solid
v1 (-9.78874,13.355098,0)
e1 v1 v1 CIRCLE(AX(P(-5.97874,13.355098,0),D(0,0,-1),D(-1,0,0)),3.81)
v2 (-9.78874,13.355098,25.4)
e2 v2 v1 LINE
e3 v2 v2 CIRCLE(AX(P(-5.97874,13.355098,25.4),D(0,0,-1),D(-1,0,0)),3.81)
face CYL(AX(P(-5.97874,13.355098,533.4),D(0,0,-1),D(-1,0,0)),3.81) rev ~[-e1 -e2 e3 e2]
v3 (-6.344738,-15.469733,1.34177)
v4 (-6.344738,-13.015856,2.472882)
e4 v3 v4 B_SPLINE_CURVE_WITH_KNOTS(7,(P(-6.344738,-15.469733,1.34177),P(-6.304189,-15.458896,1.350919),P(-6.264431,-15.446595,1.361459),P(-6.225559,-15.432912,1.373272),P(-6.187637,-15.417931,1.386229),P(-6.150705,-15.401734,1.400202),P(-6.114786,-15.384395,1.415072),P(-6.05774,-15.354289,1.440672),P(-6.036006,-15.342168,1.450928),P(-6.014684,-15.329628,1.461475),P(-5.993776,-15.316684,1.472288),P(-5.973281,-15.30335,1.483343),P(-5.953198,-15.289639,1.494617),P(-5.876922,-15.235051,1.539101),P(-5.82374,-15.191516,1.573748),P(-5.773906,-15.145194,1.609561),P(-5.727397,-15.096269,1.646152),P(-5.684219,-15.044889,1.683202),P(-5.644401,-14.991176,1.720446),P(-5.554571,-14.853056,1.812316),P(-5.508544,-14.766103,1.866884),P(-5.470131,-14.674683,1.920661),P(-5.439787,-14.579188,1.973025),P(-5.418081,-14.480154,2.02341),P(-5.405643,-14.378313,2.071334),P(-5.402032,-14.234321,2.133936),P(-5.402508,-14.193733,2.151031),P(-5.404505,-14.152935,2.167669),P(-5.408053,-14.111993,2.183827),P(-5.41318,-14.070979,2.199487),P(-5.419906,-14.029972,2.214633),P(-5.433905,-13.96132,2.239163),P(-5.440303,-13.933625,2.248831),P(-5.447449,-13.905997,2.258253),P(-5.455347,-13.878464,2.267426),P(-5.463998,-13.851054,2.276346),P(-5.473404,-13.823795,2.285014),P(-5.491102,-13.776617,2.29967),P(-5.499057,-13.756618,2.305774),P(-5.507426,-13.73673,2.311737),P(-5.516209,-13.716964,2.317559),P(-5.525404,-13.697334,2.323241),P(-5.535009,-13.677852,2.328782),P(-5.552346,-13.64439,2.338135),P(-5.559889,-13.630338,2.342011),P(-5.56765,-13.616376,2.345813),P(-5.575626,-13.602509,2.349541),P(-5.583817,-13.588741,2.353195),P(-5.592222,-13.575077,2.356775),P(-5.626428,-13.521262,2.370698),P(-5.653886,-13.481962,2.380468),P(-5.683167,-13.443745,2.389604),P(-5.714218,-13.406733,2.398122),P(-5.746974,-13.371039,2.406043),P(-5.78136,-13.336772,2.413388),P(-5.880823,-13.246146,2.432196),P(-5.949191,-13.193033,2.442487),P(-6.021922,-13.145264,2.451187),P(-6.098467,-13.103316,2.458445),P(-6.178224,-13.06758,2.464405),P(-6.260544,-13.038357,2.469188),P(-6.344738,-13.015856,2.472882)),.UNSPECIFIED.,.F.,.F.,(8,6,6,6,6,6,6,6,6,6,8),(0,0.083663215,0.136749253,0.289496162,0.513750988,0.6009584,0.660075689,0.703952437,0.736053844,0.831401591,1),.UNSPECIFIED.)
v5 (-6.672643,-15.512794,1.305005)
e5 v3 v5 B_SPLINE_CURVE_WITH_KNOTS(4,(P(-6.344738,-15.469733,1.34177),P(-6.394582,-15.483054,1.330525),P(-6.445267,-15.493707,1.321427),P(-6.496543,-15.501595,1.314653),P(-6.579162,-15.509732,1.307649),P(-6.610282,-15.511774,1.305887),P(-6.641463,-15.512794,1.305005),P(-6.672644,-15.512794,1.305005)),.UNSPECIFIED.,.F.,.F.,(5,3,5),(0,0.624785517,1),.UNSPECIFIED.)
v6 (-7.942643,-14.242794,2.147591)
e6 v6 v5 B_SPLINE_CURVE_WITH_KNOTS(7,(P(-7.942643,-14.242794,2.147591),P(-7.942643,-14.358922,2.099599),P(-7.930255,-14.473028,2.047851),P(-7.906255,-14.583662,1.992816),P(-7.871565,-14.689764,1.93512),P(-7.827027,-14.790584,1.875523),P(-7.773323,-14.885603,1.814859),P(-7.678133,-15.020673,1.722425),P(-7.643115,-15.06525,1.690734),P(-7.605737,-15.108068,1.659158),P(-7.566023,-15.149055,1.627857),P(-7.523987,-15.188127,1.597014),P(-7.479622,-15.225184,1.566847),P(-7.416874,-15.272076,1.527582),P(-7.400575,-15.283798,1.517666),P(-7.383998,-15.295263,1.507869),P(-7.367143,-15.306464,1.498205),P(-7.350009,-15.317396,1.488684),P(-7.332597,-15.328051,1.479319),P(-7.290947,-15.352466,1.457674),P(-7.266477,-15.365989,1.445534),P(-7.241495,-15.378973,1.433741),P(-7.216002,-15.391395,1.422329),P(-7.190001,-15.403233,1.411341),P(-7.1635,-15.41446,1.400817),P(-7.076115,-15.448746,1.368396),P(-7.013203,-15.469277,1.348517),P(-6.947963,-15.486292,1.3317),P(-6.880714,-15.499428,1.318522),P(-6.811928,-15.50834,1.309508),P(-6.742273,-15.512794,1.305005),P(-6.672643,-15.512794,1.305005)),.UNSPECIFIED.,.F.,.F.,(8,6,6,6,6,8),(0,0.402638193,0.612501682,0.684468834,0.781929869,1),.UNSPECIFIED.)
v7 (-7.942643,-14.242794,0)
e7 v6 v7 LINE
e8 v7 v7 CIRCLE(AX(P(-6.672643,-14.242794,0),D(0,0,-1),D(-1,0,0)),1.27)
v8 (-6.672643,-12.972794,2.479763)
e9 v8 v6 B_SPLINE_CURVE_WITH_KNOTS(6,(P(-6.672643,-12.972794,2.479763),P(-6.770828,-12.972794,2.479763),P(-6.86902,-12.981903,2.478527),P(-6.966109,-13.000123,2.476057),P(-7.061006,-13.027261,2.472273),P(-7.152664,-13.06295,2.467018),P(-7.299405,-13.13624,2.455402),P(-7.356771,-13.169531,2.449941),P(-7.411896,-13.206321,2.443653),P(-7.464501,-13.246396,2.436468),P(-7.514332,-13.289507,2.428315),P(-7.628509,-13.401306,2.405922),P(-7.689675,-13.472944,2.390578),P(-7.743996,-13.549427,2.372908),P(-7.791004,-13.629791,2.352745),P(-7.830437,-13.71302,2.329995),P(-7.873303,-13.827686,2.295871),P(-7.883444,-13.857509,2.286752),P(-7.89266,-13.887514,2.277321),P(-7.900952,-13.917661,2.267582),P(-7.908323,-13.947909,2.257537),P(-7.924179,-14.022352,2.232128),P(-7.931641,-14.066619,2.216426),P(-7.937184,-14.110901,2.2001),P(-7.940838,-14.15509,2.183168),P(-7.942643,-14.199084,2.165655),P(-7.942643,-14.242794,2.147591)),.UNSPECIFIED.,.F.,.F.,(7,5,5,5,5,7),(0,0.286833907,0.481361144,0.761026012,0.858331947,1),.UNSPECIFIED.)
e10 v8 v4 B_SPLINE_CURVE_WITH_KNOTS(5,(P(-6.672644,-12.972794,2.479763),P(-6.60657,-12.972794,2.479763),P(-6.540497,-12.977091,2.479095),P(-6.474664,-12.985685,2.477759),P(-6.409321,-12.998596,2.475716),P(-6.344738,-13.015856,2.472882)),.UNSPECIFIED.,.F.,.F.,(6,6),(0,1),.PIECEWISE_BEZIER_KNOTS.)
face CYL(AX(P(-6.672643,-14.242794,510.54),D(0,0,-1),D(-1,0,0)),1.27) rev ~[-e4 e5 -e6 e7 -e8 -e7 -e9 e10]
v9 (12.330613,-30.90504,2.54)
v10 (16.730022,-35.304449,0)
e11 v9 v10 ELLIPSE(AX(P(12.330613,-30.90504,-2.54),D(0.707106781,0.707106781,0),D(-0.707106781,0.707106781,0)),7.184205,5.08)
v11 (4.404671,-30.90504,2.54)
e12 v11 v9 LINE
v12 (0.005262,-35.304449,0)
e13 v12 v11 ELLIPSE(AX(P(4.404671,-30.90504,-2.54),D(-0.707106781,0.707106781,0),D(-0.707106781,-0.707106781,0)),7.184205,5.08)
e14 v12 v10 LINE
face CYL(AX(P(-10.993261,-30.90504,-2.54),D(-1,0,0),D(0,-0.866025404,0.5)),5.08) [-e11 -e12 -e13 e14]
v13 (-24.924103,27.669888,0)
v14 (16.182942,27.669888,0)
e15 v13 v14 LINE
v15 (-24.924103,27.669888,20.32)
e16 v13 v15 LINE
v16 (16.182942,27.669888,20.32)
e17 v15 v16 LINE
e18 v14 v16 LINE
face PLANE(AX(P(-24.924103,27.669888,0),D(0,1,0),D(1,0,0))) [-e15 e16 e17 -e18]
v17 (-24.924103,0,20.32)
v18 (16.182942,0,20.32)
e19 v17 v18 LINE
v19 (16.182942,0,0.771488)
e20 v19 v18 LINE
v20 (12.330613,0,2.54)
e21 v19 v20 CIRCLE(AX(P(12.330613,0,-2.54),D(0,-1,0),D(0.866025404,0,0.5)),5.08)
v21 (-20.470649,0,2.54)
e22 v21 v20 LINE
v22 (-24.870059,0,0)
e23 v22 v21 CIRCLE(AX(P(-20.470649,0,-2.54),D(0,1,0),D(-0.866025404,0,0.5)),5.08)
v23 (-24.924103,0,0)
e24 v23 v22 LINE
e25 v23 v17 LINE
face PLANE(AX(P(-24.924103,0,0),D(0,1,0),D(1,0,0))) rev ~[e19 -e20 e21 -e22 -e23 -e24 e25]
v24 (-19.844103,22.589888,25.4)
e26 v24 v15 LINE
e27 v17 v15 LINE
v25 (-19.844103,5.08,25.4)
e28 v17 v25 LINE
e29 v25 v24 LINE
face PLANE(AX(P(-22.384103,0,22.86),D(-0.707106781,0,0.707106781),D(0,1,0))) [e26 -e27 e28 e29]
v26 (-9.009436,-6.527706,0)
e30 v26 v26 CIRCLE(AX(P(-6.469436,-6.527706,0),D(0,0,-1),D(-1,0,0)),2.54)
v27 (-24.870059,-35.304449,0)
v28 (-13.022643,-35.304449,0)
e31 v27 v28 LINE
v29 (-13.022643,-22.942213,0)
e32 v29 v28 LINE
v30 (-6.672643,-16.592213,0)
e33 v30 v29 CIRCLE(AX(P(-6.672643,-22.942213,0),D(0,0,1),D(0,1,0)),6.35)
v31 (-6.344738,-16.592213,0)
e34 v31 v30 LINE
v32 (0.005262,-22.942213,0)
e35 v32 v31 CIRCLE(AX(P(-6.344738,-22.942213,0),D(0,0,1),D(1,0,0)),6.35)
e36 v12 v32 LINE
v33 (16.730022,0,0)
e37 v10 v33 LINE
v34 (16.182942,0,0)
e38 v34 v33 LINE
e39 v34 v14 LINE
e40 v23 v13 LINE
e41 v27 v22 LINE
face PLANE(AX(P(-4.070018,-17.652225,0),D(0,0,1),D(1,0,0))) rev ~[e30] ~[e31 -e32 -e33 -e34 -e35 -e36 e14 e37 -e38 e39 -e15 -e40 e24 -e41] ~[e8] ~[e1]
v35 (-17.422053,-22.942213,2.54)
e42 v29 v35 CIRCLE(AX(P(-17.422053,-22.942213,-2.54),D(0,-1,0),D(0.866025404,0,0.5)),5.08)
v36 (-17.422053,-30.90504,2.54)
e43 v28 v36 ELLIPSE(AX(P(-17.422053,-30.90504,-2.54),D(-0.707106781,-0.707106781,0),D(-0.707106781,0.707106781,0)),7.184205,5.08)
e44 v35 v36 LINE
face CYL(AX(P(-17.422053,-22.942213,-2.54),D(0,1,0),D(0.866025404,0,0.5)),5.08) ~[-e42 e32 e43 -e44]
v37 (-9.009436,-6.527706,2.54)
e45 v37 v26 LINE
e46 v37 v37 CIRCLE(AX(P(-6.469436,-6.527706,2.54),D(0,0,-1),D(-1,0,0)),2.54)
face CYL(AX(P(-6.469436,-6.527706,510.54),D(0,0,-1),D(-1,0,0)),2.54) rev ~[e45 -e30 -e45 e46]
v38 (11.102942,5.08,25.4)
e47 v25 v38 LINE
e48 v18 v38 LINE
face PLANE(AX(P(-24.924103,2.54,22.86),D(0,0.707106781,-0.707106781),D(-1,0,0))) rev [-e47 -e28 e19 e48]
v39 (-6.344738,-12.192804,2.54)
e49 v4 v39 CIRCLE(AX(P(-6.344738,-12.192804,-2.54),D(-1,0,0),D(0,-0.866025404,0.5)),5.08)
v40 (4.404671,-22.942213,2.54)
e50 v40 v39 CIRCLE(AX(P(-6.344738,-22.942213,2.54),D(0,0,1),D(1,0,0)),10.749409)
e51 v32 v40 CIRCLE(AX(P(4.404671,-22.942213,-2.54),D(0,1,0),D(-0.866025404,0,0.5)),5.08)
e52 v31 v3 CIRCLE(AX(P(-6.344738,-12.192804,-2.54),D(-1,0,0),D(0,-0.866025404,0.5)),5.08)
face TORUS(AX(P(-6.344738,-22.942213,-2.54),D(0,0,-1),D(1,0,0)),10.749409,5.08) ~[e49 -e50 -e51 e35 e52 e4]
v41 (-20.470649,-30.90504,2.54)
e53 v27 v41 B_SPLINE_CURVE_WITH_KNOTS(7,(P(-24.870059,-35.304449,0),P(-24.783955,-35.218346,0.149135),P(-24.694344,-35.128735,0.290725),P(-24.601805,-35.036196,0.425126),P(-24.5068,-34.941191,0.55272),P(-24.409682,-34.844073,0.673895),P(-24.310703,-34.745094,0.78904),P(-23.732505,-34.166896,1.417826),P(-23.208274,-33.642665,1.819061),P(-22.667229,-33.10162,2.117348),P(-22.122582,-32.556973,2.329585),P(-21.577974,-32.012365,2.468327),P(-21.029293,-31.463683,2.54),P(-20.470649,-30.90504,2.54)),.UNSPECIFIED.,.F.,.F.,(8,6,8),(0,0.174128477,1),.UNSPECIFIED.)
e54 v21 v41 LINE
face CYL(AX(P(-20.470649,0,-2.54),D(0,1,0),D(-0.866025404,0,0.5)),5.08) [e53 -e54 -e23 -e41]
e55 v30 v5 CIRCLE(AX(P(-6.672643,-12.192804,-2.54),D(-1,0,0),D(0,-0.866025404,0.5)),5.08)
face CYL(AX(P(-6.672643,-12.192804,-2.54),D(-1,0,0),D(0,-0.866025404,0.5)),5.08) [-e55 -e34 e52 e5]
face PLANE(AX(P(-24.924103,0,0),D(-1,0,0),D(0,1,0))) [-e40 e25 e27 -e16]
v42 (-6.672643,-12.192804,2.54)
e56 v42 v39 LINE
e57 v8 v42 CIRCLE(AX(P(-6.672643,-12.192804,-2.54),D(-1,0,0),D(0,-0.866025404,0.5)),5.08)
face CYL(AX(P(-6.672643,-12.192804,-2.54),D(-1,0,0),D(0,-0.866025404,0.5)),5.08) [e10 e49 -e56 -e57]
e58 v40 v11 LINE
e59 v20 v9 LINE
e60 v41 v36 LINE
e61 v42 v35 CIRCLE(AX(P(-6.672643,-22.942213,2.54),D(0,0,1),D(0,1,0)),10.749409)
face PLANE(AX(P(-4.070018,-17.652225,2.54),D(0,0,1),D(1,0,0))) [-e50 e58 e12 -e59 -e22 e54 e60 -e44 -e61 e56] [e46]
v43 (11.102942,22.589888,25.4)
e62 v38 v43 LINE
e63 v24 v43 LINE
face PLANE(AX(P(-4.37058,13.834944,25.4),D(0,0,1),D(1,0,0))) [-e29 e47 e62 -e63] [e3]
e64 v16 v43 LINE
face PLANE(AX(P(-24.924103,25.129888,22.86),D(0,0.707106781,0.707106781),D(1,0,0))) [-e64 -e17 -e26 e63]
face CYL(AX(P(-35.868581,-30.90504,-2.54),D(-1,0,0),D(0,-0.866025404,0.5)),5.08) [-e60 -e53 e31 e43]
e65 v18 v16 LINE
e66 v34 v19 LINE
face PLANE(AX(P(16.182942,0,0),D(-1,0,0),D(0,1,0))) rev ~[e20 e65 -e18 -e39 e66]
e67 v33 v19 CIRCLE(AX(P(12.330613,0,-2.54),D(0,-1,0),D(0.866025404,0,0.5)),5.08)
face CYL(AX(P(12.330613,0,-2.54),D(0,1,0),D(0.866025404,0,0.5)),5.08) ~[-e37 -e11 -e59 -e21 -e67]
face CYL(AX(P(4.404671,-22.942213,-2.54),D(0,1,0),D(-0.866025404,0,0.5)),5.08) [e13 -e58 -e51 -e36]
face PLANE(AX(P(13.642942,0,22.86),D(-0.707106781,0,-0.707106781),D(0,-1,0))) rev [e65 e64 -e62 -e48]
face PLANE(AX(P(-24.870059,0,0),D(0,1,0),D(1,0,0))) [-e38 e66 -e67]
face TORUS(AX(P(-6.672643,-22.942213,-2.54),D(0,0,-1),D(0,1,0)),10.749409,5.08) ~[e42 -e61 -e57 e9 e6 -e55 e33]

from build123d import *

# Parameters (mm, degrees)
F0_W          = 41.1070454866
F0_H          = 27.6698879898
F1_DEPTH      = 25.4
F2_W          = 41.600080207
F2_H          = 35.3044494987
F3_DEPTH      = 2.54
F5_DEPTH      = 25.4
F7_D          = 7.62
F7_DEPTH      = 508
F7_TIP        = 2.2892789585
F9_D          = 2.54
F9_DEPTH      = 508
F9_TIP        = 0.7630929862
F11_D         = 5.08
F11_DEPTH     = 508
F11_TIP       = 1.5261859723
F12_SIZE      = 5.08
F13_T1_DEPTH  = 46.3029721267
F13_T3_DEPTH  = 38.7218051595
F13_T5_DEPTH  = 33.8444602975
F13_T7_DEPTH  = 23.3607587036
F13_T9_DEPTH  = 0.3279052623
F13_T12_ANGLE = 90
F13_T14_ANGLE = 90


# Not quite as in the source:
# - a fillet or chamfer that OpenCascade refuses, or shapes differently, is made with other operations: its cross-section is extruded or revolved along the edge and cut away or added


with BuildPart() as f1:
    # F0 (on Top) → F1 (new body)
    with BuildSketch(Plane.XY):
        with Locations((-4.3705804273, 13.8349439949)):
            Rectangle(F0_W, F0_H)
    extrude(amount=F1_DEPTH)

    # F2 (on Top) → F3 (join)
    with BuildSketch(Plane.XY):
        with Locations((-4.0700184181, -17.6522247493)):
            Rectangle(F2_W, F2_H)
    extrude(amount=F3_DEPTH)

    # F4 (on face) → F5 (cut)
    with BuildSketch(Plane.XY.offset(2.54)):
        with BuildLine():
            Line((-13.0226434802, -22.9422134231), (-13.0226434802, -45.534973538))
            Line((-13.0226434802, -45.534973538), (0.005261782, -45.534973538))
            Line((0.005261782, -45.534973538), (0.005261782, -22.9422134231))
            ThreePointArc((0.005261782, -22.9422134231), (-1.8546101574, -18.4520853626), (-6.344738218, -16.5922134231))
            Line((-6.344738218, -16.5922134231), (-6.6726434802, -16.5922134231))
            ThreePointArc((-6.6726434802, -16.5922134231), (-11.1627715408, -18.4520853626), (-13.0226434802, -22.9422134231))
        make_face()
    extrude(amount=-F5_DEPTH, mode=Mode.SUBTRACT)

    # F7
    with Locations(Plane.XY.offset(25.4)):
        with Locations((-5.9787402861, 13.3550977334)):
            Hole(F7_D / 2, depth=F7_DEPTH)
            with Locations((0, 0, -(F7_DEPTH + F7_TIP / 2))):  # 118° drill point
                Cone(0, F7_D / 2, F7_TIP, mode=Mode.SUBTRACT)

    # F9
    with Locations(Plane.XY.offset(2.54)):
        with Locations((-6.6726434802, -14.2427943647)):
            Hole(F9_D / 2, depth=F9_DEPTH)
            with Locations((0, 0, -(F9_DEPTH + F9_TIP / 2))):  # 118° drill point
                Cone(0, F9_D / 2, F9_TIP, mode=Mode.SUBTRACT)

    # F11
    with Locations(Plane.XY.offset(2.54)):
        with Locations((-6.4694355242, -6.5277060494)):
            Hole(F11_D / 2, depth=F11_DEPTH)
            with Locations((0, 0, -(F11_DEPTH + F11_TIP / 2))):  # 118° drill point
                Cone(0, F11_D / 2, F11_TIP, mode=Mode.SUBTRACT)

    # F12
    f12_edges = [f1.edges().sort_by_distance(p)[0] for p in [
        (-4.37058, 0, 25.4),
        (16.182942, 13.834944, 25.4),
        (-4.37058, 27.669888, 25.4),
        (-24.924103, 13.834944, 25.4),
    ]]
    chamfer(f12_edges, length=F12_SIZE)

    # F13: fillet of radius 5.08 on 5 edges, made by hand

    # F13_s2 → F13_t1 (cut)
    with BuildSketch(Plane.XZ):
        with BuildLine():
            ThreePointArc((16.7300216854, 0), (14.8706126341, 1.8594090512), (12.3306126341, 2.54))
            Line((12.3306126341, 2.54), (16.7300216854, 2.54))
            Line((16.7300216854, 2.54), (16.7300216854, 0))
        make_face()
        with BuildLine():
            ThreePointArc((-24.8700585216, 0), (-23.0106494704, 1.8594090512), (-20.4706494704, 2.54))
            Line((-20.4706494704, 2.54), (-24.8700585216, 2.54))
            Line((-24.8700585216, 2.54), (-24.8700585216, 0))
        make_face()
    extrude(amount=F13_T1_DEPTH, mode=Mode.SUBTRACT)

    # F13_s4 → F13_t3 (cut)
    with BuildSketch(Plane.YZ.offset(-10.993260846)):
        with BuildLine():
            ThreePointArc((-35.3044494987, 0), (-33.4450404474, 1.8594090512), (-30.9050404474, 2.54))
            Line((-30.9050404474, 2.54), (-35.3044494987, 2.54))
            Line((-35.3044494987, 2.54), (-35.3044494987, 0))
        make_face()
    extrude(amount=F13_T3_DEPTH, mode=Mode.SUBTRACT)

    # F13_s6 → F13_t5 (cut)
    with BuildSketch(Plane.YZ.offset(-35.8685811497)):
        with BuildLine():
            ThreePointArc((-35.3044494987, 0), (-33.4450404474, 1.8594090512), (-30.9050404474, 2.54))
            Line((-30.9050404474, 2.54), (-35.3044494987, 2.54))
            Line((-35.3044494987, 2.54), (-35.3044494987, 0))
        make_face()
    extrude(amount=F13_T5_DEPTH, mode=Mode.SUBTRACT)

    # F13_s8 → F13_t7 (cut)
    with BuildSketch(Plane.XZ.offset(22.9422134231)):
        with BuildLine():
            ThreePointArc((0.005261782, 0), (1.8646708333, 1.8594090512), (4.4046708333, 2.54))
            Line((4.4046708333, 2.54), (0.005261782, 2.54))
            Line((0.005261782, 2.54), (0.005261782, 0))
        make_face()
        with BuildLine():
            ThreePointArc((-13.0226434802, 0), (-14.8820525315, 1.8594090512), (-17.4220525315, 2.54))
            Line((-17.4220525315, 2.54), (-13.0226434802, 2.54))
            Line((-13.0226434802, 2.54), (-13.0226434802, 0))
        make_face()
    extrude(amount=F13_T7_DEPTH, mode=Mode.SUBTRACT)

    # F13_s10 → F13_t9 (cut)
    with BuildSketch(Plane.YZ.offset(-6.6726434802)):
        with BuildLine():
            ThreePointArc((-16.5922134231, 0), (-14.7328043719, 1.8594090512), (-12.1928043719, 2.54))
            Line((-12.1928043719, 2.54), (-16.5922134231, 2.54))
            Line((-16.5922134231, 2.54), (-16.5922134231, 0))
        make_face()
    extrude(amount=F13_T9_DEPTH, mode=Mode.SUBTRACT)

    # F13_s11 → F13_t12 (revolve, cut)
    with BuildSketch(Plane.XZ.offset(22.9422134231)):
        with BuildLine():
            ThreePointArc((0.005261782, 0), (1.8646708333, 1.8594090512), (4.4046708333, 2.54))
            Line((4.4046708333, 2.54), (0.005261782, 2.54))
            Line((0.005261782, 2.54), (0.005261782, 0))
        make_face()
    revolve(axis=Axis((-6.344738218, -22.9422134231, 2.54), (0, 0, 1)), revolution_arc=F13_T12_ANGLE, mode=Mode.SUBTRACT)

    # F13_s13 → F13_t14 (revolve, cut)
    with BuildSketch(Plane.YZ.offset(-6.6726434802)):
        with BuildLine():
            ThreePointArc((-16.5922134231, 0), (-14.7328043719, 1.8594090512), (-12.1928043719, 2.54))
            Line((-12.1928043719, 2.54), (-16.5922134231, 2.54))
            Line((-16.5922134231, 2.54), (-16.5922134231, 0))
        make_face()
    revolve(axis=Axis((-6.6726434802, -22.9422134231, 2.54), (0, 0, 1)), revolution_arc=F13_T14_ANGLE, mode=Mode.SUBTRACT)


solid = f1.part
